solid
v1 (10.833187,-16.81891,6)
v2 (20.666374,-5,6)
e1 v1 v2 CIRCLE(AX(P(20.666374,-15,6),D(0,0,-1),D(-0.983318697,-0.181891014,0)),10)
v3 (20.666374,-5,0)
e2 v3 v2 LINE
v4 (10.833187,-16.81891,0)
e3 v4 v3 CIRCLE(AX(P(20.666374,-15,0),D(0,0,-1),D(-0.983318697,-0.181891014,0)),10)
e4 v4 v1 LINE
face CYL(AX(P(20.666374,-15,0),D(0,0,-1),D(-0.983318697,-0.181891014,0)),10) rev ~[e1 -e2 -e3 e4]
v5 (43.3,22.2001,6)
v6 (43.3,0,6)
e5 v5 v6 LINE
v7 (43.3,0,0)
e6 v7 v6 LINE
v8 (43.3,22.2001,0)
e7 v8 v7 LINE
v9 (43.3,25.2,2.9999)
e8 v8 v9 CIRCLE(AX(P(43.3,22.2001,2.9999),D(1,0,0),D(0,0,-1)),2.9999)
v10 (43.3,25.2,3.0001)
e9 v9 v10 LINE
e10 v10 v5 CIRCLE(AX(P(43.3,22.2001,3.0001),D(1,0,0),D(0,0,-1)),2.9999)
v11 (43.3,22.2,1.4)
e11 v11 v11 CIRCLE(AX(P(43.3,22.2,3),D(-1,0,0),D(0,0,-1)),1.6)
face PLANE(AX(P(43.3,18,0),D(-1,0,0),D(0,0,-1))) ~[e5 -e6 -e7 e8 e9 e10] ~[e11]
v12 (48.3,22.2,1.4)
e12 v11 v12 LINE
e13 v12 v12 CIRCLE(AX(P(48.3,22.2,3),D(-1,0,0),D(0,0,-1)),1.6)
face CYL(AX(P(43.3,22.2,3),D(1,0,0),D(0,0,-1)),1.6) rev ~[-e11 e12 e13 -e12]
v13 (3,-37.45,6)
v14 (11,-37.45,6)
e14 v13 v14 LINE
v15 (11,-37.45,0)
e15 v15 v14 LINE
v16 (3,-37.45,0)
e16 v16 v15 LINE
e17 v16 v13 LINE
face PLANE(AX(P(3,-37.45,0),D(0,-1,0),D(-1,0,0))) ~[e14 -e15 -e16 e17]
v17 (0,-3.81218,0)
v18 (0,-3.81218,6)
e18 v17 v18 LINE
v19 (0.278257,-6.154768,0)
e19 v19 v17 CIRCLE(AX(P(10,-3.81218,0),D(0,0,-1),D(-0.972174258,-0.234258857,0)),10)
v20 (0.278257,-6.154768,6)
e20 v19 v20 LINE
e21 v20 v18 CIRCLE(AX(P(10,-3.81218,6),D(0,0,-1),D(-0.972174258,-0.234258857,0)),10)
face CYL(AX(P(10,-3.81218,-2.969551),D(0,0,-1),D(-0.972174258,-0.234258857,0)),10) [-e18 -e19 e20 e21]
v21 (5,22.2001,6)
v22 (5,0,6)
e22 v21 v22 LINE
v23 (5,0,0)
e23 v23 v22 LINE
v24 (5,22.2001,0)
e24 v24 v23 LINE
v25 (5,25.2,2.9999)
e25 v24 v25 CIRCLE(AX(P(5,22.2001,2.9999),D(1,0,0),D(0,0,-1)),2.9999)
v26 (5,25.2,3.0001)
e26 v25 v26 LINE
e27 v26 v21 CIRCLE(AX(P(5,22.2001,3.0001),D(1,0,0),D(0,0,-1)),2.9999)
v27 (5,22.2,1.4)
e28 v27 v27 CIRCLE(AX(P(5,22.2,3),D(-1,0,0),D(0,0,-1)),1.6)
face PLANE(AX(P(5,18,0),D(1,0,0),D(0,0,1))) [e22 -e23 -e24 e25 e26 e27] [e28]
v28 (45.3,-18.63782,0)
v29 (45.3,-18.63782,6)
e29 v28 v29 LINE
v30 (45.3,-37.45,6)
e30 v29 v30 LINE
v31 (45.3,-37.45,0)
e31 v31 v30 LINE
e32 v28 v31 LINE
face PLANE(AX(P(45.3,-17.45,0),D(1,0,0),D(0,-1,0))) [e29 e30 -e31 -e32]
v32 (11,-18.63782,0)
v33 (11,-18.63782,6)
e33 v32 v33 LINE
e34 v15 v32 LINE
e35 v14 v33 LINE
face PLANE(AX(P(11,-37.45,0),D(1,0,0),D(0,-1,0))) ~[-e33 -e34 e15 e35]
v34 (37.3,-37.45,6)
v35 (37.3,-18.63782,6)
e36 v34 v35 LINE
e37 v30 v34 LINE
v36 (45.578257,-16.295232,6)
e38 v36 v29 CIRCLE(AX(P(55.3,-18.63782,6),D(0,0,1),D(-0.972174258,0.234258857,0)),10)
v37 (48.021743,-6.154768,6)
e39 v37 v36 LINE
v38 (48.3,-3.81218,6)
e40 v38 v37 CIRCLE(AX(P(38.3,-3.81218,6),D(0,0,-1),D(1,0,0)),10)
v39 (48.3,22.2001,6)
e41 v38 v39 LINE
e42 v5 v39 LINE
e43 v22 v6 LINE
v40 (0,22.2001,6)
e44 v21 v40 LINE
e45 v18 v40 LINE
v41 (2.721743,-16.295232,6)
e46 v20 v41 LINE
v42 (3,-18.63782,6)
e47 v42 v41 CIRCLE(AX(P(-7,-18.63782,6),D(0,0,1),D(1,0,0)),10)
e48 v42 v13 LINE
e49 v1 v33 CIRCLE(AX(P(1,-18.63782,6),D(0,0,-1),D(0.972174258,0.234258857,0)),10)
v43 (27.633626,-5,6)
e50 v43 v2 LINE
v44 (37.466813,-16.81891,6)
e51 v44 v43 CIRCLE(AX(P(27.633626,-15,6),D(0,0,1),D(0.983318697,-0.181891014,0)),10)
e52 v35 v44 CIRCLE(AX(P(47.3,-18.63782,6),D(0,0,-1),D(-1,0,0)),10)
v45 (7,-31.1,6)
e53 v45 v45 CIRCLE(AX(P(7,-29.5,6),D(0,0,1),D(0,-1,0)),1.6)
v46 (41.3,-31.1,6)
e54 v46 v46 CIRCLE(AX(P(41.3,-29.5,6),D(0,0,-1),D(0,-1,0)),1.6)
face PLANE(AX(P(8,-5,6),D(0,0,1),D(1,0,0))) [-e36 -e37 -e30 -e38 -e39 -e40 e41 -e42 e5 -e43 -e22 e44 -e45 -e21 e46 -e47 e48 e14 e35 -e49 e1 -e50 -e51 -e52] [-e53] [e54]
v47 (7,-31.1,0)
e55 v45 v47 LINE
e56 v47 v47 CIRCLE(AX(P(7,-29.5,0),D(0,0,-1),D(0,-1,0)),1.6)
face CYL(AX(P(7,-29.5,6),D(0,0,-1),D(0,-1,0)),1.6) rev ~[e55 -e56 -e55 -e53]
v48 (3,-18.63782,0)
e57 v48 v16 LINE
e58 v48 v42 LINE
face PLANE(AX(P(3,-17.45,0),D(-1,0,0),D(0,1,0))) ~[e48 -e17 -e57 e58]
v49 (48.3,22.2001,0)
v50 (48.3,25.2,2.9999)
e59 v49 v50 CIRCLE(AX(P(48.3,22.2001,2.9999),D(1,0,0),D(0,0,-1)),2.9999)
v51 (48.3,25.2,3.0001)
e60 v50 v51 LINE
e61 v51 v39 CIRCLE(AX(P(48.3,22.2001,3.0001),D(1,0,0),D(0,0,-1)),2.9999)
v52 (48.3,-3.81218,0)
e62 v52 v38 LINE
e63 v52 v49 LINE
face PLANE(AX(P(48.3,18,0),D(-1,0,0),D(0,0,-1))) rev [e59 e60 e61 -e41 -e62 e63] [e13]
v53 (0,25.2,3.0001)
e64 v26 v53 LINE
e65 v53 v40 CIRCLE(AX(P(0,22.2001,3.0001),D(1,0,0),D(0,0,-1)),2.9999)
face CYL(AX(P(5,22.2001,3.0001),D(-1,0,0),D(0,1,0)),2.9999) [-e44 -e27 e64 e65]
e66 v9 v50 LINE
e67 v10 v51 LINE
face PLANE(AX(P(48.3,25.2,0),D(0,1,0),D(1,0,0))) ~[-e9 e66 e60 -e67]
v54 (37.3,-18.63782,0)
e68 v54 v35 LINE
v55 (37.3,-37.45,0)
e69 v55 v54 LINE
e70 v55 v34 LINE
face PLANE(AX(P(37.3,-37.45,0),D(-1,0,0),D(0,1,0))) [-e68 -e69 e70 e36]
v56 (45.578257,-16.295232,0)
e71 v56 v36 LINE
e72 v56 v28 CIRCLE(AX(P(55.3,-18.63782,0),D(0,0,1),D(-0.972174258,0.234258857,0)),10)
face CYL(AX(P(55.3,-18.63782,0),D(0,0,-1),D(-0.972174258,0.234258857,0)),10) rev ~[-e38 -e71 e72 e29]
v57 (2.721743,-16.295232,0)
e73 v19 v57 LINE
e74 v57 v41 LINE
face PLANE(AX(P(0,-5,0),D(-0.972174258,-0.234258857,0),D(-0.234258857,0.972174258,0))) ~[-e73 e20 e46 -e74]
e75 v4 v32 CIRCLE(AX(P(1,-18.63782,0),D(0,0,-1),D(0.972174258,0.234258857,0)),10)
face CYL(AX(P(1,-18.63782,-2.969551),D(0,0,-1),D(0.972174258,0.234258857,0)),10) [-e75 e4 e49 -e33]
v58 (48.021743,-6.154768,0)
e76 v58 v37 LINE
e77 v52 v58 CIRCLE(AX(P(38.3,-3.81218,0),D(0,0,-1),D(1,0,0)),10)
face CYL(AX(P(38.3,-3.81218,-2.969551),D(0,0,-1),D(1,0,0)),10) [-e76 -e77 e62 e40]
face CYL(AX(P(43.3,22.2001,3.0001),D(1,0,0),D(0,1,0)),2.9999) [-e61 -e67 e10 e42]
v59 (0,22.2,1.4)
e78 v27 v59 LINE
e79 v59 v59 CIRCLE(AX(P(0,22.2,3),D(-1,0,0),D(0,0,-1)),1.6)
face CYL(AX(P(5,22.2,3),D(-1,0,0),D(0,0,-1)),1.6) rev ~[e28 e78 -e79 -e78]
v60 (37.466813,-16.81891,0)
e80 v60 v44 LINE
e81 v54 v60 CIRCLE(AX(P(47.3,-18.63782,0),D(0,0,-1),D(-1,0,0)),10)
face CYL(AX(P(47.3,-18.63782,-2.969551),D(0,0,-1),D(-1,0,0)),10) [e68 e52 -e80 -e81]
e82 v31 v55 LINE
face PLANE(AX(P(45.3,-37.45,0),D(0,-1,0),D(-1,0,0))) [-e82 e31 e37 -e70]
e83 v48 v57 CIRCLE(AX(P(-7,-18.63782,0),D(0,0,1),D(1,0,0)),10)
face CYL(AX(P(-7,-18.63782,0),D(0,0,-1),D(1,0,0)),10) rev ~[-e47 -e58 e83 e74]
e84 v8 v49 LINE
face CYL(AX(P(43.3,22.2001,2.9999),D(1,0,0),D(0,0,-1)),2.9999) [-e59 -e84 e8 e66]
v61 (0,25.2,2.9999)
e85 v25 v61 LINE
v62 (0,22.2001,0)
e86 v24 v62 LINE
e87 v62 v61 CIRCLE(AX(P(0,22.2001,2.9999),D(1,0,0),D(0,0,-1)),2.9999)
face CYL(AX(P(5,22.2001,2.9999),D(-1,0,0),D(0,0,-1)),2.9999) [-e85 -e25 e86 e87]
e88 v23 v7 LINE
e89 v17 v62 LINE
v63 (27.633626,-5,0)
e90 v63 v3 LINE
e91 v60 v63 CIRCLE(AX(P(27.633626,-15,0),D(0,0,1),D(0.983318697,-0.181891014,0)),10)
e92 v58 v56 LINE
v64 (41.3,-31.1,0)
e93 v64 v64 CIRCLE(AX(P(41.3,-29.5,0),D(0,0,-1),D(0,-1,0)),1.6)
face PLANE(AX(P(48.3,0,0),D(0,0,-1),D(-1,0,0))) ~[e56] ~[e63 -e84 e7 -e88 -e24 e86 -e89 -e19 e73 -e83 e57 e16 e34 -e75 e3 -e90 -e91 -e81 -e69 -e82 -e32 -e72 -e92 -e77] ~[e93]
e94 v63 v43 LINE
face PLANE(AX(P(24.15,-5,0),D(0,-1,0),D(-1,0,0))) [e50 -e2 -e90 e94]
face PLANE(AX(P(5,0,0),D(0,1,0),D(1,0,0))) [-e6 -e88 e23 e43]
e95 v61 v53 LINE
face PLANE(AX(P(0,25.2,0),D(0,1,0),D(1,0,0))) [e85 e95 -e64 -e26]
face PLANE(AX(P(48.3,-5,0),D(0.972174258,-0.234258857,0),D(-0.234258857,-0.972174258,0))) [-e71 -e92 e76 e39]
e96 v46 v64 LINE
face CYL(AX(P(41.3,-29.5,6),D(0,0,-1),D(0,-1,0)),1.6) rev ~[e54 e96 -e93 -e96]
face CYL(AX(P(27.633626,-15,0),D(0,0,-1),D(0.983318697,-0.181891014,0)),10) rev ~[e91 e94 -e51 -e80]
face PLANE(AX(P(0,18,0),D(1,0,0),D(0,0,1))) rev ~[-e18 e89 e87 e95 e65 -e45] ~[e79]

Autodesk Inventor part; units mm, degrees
ref_plane "YZ Plane" through (0, 0, 0) normal (1, 0, 0) x (0, 1, 0)
ref_plane "XZ Plane" through (0, 0, 0) normal (0, 1, 0) x (-1, 0, 0)
sketch "Эскиз1" plane through (0, 0, 0) normal (0, 0, 1) x (1, 0, 0)
  line L0 (0, 0) -> (5, 0)
  line L1 (5, 0) -> (5, 18)
  line L2 (5, 18) -> (0, 18)
  line L3 (0, 18) -> (0, 0)
  line L4 (0, 0) -> (24.15, 0)
  line L5 (24.15, 0) -> (24.15, -5)
  line L6 (24.15, -5) -> (0, -5)
  line L7 (0, -5) -> (0, 0)
  dimension "d0" = 5
  dimension "d1" = 18
  dimension "d2" = 24.15
  dimension "d3" = 5
extrude "Выдавливание1" add sketch "Эскиз1" along normal blind 6
sketch "Эскиз4" plane through (0, 18, 0) normal (0, 1, 0) x (1, 0, 0)
  line L0 (0, 0) -> (0, -6) projected
  line L1 (0, 0) -> (0, -6) projected
  line L2 (5, 0) -> (0, 0) projected
  line L3 (0, 0) -> (0, -6) projected
  line L4 (5, -6) -> (0, -6) projected
  line L5 (5, 0) -> (5, -6) projected
extrude "Выдавливание2" add sketch "Эскиз4" along normal blind 7.2
fillet "Сопряжение1" radius 3 2 edges at (2.5, 25.2, 6) (2.5, 25.2, 0)
sketch "Эскиз5" plane through (5, 0, 6) normal (1, 0, 0) x (0, 0, -1)
  line L0 (0, -5) -> (0, -5) projected
  arc A0 (6, 22.2) -> (0, 22.2) centre (3, 22.2) ccw projected
  point P0 (6, 0)
  point P1 (6, -5)
  point P2 (2.5, 25.2)
hole "Отверстие2" at (5, 22.2, 3) direction (-1, 0, 0) diameter 3.2 depth 5
mirror "Зеркальное отражение1" about plane through (24.15, -5, 0) normal (1, 0, 0)
sketch "Эскиз9" plane through (0, 0, 0) normal (0, 0, -1) x (-1, 0, 0)
  line L0 (0, -5) -> (-48.3, -5) projected
  line L1 (-48.3, 22.2) -> (-48.3, -5) projected
  line L2 (-48.3, -5) -> (-45.3, -17.45)
  line L3 (-45.3, -17.45) -> (-45.3, -37.45)
  line L4 (-45.3, -37.45) -> (-37.3, -37.45)
  line L5 (-37.3, -37.45) -> (-37.3, -17.45)
  line L6 (-37.3, -17.45) -> (-40.3, -5)
  point P0 (0, 0)
  point P1 (-40.3, -5)
  dimension "d82" = 32.45
  dimension "d83" = 8
  dimension "d86" = 20
  dimension "d93" = 3
extrude "Выдавливание4" add sketch "Эскиз9" against normal blind 6
sketch "Эскиз11" plane through (0, 0, 6) normal (0, 0, 1) x (1, 0, 0)
  line L0 (41.3, -37.45) -> (41.3, -29.5)
  line L1 (37.3, -37.45) -> (45.3, -37.45) projected
  point P0 (0, 0)
  dimension "d91" = 7.95
hole "Отверстие6" at (41.3, -29.5, 6) direction (0, 0, -1) diameter 3.2 end through all
ref_plane "РабПлоскость1" through (24.15, 22.2, 3) normal (1, 0, 0) x (0, 0, -1)
mirror "Зеркальное отражение2" about plane through (24.15, 22.2, 3) normal (1, 0, 0) of "Выдавливание4", "Отверстие6"
fillet "Сопряжение3" radius 10 8 edges at (45.3, -17.45, 3) (37.3, -17.45, 3) (11, -17.45, 3) (3, -17.45, 3) (0, -5, 3) (8, -5, 3) (40.3, -5, 3) (48.3, -5, 3)
equation "\"Радиус_гибки\" = Толщина"
equation "\"Ширина_просечки\" = Толщина"
equation "\"Глубина_просечки\" = 0.5 * Толщина"
equation "\"Размер_просечки\" = 4 * Толщина"
equation "\"Мин_остаток\" = 2 * Толщина"
equation "\"Радиус_перехода\" = Радиус_гибки"
equation "\"Радиус_Якоби\" = Толщина"
equation "\"Размер_зазора\" = Толщина"
equation "\"Толщина\" = 0.5"
properties part number "Стойка для камеры"
